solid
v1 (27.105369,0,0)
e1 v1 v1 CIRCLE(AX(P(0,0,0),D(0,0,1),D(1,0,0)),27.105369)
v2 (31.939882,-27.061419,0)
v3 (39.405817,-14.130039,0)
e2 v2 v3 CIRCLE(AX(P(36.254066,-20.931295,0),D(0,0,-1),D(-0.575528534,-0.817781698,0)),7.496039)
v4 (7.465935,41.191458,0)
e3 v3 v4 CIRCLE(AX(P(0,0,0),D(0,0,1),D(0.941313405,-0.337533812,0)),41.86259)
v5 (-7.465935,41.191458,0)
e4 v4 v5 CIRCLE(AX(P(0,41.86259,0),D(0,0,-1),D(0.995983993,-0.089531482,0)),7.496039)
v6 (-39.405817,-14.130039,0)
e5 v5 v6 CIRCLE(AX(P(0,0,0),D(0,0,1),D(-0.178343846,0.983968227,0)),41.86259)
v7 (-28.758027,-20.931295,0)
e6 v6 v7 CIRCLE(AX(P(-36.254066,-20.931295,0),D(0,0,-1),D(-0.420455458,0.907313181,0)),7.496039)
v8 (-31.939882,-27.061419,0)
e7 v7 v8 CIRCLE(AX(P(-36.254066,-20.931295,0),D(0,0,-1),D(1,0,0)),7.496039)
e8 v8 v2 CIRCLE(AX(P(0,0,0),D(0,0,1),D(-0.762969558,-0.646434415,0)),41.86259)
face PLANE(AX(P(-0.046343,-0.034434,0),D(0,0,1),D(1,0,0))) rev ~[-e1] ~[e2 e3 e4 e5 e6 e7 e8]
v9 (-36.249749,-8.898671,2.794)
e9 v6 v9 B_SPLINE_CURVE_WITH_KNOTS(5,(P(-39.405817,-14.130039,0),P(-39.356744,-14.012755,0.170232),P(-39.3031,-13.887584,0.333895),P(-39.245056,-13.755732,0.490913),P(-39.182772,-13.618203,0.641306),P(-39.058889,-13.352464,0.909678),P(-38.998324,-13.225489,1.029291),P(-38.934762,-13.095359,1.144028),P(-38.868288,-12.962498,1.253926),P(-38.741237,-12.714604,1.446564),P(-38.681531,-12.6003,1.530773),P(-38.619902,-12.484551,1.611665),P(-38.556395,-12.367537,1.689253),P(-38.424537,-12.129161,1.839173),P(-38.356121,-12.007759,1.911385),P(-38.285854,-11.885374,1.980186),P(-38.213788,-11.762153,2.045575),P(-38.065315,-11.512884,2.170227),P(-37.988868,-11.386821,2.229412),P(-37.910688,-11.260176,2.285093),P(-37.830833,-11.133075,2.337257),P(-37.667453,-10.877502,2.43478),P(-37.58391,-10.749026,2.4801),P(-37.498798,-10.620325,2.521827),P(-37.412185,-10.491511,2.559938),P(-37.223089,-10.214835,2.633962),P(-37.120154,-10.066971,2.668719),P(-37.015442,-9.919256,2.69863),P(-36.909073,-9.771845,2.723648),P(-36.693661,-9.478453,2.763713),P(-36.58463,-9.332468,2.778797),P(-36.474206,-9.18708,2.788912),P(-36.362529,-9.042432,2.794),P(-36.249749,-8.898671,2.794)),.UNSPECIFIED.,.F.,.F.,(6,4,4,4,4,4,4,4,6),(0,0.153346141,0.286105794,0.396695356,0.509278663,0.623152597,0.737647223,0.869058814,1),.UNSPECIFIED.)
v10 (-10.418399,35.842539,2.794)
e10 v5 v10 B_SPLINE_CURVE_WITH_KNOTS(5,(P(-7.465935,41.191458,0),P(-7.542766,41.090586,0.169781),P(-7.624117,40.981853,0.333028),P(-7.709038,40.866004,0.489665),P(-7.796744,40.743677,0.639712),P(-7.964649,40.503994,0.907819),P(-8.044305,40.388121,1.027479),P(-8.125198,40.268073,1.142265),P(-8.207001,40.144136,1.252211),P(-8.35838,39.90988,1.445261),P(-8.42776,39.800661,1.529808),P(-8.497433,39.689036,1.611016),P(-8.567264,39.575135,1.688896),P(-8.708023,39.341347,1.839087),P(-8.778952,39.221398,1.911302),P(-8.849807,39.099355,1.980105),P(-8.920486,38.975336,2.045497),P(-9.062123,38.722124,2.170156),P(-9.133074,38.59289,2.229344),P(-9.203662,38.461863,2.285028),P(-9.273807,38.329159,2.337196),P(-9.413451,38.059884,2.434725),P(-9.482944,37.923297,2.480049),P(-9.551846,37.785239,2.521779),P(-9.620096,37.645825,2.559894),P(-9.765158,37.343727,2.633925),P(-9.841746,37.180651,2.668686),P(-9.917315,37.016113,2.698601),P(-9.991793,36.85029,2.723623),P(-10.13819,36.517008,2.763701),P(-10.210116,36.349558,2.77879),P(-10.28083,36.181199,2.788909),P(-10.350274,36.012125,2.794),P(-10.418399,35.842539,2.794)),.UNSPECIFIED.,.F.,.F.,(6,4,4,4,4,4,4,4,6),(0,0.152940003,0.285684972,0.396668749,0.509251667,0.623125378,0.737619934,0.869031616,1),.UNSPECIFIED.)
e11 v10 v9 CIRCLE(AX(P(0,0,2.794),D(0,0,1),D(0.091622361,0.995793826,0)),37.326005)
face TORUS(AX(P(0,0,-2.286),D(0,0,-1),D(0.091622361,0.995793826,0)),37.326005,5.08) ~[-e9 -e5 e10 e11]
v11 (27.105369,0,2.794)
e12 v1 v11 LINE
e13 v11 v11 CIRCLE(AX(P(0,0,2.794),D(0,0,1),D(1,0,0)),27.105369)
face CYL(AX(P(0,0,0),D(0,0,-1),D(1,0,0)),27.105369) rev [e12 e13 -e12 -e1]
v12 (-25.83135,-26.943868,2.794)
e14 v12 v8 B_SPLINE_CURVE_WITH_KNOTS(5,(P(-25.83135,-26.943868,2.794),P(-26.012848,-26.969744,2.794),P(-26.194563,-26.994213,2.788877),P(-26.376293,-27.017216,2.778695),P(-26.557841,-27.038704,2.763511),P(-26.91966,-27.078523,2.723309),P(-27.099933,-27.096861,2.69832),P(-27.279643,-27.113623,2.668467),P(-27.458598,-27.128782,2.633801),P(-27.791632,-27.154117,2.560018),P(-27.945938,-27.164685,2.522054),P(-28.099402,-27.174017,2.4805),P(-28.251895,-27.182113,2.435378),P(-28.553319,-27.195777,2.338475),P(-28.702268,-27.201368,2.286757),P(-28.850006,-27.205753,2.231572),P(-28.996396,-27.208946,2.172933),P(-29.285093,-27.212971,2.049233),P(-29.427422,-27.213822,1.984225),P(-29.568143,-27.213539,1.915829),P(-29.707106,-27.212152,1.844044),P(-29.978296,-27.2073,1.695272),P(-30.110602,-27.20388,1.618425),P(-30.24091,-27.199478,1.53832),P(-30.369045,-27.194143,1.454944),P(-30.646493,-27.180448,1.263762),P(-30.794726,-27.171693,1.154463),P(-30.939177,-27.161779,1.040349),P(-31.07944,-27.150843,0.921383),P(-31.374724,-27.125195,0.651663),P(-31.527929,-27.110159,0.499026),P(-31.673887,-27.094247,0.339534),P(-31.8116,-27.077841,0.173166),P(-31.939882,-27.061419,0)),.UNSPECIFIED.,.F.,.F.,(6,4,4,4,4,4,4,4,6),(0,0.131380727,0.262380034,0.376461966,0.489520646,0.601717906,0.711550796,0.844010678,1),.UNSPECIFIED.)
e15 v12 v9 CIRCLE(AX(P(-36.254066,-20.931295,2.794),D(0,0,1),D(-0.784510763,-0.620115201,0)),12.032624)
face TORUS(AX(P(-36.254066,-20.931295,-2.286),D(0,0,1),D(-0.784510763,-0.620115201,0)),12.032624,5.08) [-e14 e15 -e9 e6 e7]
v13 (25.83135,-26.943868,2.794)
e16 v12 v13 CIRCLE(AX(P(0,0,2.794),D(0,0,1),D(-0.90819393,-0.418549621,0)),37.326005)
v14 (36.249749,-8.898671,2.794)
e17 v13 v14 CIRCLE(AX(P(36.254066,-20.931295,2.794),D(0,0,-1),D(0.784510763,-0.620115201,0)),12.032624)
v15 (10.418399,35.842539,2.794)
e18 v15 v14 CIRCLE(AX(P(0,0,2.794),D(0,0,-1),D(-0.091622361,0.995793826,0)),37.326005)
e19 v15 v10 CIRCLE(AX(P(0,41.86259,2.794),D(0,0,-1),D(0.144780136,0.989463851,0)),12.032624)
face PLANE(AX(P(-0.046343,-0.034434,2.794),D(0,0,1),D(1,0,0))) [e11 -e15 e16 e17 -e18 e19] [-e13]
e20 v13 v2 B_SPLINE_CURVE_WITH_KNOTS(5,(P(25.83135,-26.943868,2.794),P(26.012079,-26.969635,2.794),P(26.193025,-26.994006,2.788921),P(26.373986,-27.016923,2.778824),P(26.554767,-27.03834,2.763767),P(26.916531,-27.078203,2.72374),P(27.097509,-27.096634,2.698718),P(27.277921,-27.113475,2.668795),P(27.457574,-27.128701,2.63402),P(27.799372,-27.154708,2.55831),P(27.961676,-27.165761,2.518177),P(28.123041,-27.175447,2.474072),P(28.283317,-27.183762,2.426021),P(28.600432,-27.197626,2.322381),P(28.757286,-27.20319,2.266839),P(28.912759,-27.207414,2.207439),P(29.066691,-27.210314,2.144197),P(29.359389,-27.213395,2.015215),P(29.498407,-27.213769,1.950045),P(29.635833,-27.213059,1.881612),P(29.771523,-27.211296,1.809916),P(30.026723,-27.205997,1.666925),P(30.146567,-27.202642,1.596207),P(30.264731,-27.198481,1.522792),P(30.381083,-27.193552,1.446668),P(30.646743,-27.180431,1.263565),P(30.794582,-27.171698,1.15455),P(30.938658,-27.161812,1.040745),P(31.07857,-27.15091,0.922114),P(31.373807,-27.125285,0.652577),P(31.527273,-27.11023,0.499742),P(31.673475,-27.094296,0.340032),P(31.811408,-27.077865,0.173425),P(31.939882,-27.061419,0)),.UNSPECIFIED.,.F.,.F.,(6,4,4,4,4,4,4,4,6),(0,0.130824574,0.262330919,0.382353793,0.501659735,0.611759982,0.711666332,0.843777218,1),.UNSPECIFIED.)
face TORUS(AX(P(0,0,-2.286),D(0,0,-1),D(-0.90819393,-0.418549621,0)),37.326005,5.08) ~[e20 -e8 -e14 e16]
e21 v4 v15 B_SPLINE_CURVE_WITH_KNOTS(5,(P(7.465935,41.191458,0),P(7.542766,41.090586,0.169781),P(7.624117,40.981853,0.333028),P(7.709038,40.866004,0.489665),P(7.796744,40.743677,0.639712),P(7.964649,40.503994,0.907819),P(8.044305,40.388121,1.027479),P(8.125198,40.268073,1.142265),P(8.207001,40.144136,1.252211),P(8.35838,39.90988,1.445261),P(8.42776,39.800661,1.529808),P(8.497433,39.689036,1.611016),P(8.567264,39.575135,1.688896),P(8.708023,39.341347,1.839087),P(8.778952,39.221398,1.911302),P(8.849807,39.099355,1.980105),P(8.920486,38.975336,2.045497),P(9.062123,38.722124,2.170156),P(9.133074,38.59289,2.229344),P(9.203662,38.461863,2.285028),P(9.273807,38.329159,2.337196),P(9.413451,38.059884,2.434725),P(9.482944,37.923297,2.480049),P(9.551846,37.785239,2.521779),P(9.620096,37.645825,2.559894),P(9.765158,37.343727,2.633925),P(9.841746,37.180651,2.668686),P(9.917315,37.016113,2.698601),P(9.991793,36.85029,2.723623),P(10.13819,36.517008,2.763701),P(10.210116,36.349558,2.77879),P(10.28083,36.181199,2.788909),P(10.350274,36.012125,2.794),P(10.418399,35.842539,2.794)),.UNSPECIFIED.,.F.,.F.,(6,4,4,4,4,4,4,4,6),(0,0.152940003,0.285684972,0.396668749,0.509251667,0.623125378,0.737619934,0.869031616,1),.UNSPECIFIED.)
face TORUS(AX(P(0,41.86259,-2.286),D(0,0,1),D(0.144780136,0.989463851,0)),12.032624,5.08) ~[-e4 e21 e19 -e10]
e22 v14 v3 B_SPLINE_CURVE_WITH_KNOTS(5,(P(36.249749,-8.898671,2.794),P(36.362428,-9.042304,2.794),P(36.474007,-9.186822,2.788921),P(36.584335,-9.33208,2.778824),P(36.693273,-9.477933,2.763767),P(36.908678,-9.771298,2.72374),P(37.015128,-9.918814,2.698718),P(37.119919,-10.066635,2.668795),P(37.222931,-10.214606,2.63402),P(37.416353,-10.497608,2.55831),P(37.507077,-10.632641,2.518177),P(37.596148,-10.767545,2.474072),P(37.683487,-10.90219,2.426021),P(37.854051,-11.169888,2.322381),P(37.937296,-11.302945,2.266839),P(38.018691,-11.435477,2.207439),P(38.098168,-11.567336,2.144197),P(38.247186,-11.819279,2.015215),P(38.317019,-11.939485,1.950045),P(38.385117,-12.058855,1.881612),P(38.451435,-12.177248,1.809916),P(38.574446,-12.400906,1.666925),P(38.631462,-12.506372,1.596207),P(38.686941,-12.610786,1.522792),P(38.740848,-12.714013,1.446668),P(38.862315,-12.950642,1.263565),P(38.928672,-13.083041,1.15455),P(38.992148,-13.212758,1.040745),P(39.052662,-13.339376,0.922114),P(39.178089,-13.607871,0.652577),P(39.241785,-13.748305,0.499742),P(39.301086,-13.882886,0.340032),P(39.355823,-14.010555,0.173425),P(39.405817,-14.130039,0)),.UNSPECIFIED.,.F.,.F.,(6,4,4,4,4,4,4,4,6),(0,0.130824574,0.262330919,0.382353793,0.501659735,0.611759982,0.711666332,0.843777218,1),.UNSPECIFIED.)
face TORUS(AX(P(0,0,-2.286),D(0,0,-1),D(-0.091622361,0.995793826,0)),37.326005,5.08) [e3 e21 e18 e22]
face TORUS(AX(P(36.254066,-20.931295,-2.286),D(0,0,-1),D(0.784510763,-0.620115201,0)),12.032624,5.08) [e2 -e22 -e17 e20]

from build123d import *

# Parameters (mm, degrees)
F0_R         = 27.1053686487
F1_DEPTH     = 2.794
F2_T2_ANGLE  = 130.513894387
F2_T4_ANGLE  = 343.3509048615
F2_T6_ANGLE  = 130.513894387
F2_T8_ANGLE  = 343.3509048615
F2_T10_ANGLE = 130.513894387
F2_T12_ANGLE = 343.3509048615


# Not quite as in the source:
# - a fillet or chamfer that OpenCascade refuses, or shapes differently, is made with other operations: its cross-section is extruded or revolved along the edge and cut away or added


with BuildPart() as f1:
    # F0 (on Top) → F1 (new body)
    with BuildSketch(Plane.XY):
        with BuildLine():
            ThreePointArc((39.4058168676, -14.1300394968), (41.2438235607, -7.1710136852), (41.8625897333, 0))
            ThreePointArc((41.8625897333, 0), (32.1326921102, 26.8321918026), (7.4659352731, 41.1914582126))
            ThreePointArc((7.4659352731, 41.1914582126), (0, 34.366550311), (-7.4659352731, 41.1914582126))
            ThreePointArc((-7.4659352731, 41.1914582126), (-36.2540661773, 20.9312948667), (-39.4058168676, -14.1300394968))
            ThreePointArc((-39.4058168676, -14.1300394968), (-32.218910691, -14.6140069025), (-28.758026755, -20.9312948667))
            ThreePointArc((-28.758026755, -20.9312948667), (-29.6008750359, -24.3846489835), (-31.9398815945, -27.0614187158))
            ThreePointArc((-31.9398815945, -27.0614187158), (0, -41.8625897333), (31.9398815945, -27.0614187158))
            ThreePointArc((31.9398815945, -27.0614187158), (29.7623056098, -17.1832751555), (39.4058168676, -14.1300394968))
        make_face()
        Circle(F0_R, mode=Mode.SUBTRACT)
    extrude(amount=F1_DEPTH)

    # F2: fillet of radius 5.08 on 6 edges, made by hand

    # F2_s1 → F2_t2 (revolve, cut)
    with BuildSketch(Plane(origin=(0, 0, 0), x_dir=(0, 0, 1), z_dir=(0.9957938256, -0.0916223607, 0))):
        with BuildLine():
            ThreePointArc((2.794, -37.3260046741), (2.0394641369, -39.9899791484), (0, -41.8625897333))
            Line((0, -41.8625897333), (2.794, -41.8625897333))
            Line((2.794, -41.8625897333), (2.794, -37.3260046741))
        make_face()
    revolve(axis=Axis((0, 0, 2.794), (0, 0, 1)), revolution_arc=F2_T2_ANGLE, mode=Mode.SUBTRACT)

    # F2_s3 → F2_t4 (revolve, cut)
    with BuildSketch(Plane(origin=(3.7584385128, 4.7548188772, 0), x_dir=(0, 0, 1), z_dir=(0.6201152013, 0.7845107629, 0))):
        with BuildLine():
            ThreePointArc((0, 48.9175586674), (2.0394641369, 50.7901692523), (2.794, 53.4541437266))
            Line((2.794, 53.4541437266), (2.794, 48.9175586674))
            Line((2.794, 48.9175586674), (0, 48.9175586674))
        make_face()
    revolve(axis=Axis((36.2540661773, -20.9312948667, 2.794), (0, 0, -1)), revolution_arc=F2_T4_ANGLE, mode=Mode.SUBTRACT)

    # F2_s5 → F2_t6 (revolve, cut)
    with BuildSketch(Plane(origin=(0, 0, 0), x_dir=(0, 0, 1), z_dir=(-0.4185496208, 0.9081939302, 0))):
        with BuildLine():
            ThreePointArc((2.794, -37.3260046741), (2.0394641369, -39.9899791484), (0, -41.8625897333))
            Line((0, -41.8625897333), (2.794, -41.8625897333))
            Line((2.794, -41.8625897333), (2.794, -37.3260046741))
        make_face()
    revolve(axis=Axis((0, 0, 2.794), (0, 0, 1)), revolution_arc=F2_T6_ANGLE, mode=Mode.SUBTRACT)

    # F2_s7 → F2_t8 (revolve, cut)
    with BuildSketch(Plane(origin=(-3.7584385128, 4.7548188772, 0), x_dir=(0, 0, 1), z_dir=(-0.6201152013, 0.7845107629, 0))):
        with BuildLine():
            ThreePointArc((2.794, -53.4541437266), (2.0394641369, -50.7901692523), (0, -48.9175586674))
            Line((0, -48.9175586674), (2.794, -48.9175586674))
            Line((2.794, -48.9175586674), (2.794, -53.4541437266))
        make_face()
    revolve(axis=Axis((-36.2540661773, -20.9312948667, 2.794), (0, 0, 1)), revolution_arc=F2_T8_ANGLE, mode=Mode.SUBTRACT)

    # F2_s9 → F2_t10 (revolve, cut)
    with BuildSketch(Plane(origin=(0, 0, 0), x_dir=(0, 0, 1), z_dir=(-0.9957938256, -0.0916223607, 0))):
        with BuildLine():
            ThreePointArc((2.794, 37.3260046741), (2.0394641369, 39.9899791484), (0, 41.8625897333))
            Line((0, 41.8625897333), (2.794, 41.8625897333))
            Line((2.794, 41.8625897333), (2.794, 37.3260046741))
        make_face()
    revolve(axis=Axis((0, 0, 2.794), (0, 0, -1)), revolution_arc=F2_T10_ANGLE, mode=Mode.SUBTRACT)

    # F2_s11 → F2_t12 (revolve, cut)
    with BuildSketch(Plane(origin=(-5.9970131945, 0.877493792, 0), x_dir=(0, 0, 1), z_dir=(-0.9894638509, 0.1447801361, 0))):
        with BuildLine():
            ThreePointArc((2.794, 53.4541437266), (2.0394641369, 50.7901692523), (0, 48.9175586674))
            Line((0, 48.9175586674), (2.794, 48.9175586674))
            Line((2.794, 48.9175586674), (2.794, 53.4541437266))
        make_face()
    revolve(axis=Axis((0, 41.8625897333, 2.794), (0, 0, -1)), revolution_arc=F2_T12_ANGLE, mode=Mode.SUBTRACT)


solid = f1.part
